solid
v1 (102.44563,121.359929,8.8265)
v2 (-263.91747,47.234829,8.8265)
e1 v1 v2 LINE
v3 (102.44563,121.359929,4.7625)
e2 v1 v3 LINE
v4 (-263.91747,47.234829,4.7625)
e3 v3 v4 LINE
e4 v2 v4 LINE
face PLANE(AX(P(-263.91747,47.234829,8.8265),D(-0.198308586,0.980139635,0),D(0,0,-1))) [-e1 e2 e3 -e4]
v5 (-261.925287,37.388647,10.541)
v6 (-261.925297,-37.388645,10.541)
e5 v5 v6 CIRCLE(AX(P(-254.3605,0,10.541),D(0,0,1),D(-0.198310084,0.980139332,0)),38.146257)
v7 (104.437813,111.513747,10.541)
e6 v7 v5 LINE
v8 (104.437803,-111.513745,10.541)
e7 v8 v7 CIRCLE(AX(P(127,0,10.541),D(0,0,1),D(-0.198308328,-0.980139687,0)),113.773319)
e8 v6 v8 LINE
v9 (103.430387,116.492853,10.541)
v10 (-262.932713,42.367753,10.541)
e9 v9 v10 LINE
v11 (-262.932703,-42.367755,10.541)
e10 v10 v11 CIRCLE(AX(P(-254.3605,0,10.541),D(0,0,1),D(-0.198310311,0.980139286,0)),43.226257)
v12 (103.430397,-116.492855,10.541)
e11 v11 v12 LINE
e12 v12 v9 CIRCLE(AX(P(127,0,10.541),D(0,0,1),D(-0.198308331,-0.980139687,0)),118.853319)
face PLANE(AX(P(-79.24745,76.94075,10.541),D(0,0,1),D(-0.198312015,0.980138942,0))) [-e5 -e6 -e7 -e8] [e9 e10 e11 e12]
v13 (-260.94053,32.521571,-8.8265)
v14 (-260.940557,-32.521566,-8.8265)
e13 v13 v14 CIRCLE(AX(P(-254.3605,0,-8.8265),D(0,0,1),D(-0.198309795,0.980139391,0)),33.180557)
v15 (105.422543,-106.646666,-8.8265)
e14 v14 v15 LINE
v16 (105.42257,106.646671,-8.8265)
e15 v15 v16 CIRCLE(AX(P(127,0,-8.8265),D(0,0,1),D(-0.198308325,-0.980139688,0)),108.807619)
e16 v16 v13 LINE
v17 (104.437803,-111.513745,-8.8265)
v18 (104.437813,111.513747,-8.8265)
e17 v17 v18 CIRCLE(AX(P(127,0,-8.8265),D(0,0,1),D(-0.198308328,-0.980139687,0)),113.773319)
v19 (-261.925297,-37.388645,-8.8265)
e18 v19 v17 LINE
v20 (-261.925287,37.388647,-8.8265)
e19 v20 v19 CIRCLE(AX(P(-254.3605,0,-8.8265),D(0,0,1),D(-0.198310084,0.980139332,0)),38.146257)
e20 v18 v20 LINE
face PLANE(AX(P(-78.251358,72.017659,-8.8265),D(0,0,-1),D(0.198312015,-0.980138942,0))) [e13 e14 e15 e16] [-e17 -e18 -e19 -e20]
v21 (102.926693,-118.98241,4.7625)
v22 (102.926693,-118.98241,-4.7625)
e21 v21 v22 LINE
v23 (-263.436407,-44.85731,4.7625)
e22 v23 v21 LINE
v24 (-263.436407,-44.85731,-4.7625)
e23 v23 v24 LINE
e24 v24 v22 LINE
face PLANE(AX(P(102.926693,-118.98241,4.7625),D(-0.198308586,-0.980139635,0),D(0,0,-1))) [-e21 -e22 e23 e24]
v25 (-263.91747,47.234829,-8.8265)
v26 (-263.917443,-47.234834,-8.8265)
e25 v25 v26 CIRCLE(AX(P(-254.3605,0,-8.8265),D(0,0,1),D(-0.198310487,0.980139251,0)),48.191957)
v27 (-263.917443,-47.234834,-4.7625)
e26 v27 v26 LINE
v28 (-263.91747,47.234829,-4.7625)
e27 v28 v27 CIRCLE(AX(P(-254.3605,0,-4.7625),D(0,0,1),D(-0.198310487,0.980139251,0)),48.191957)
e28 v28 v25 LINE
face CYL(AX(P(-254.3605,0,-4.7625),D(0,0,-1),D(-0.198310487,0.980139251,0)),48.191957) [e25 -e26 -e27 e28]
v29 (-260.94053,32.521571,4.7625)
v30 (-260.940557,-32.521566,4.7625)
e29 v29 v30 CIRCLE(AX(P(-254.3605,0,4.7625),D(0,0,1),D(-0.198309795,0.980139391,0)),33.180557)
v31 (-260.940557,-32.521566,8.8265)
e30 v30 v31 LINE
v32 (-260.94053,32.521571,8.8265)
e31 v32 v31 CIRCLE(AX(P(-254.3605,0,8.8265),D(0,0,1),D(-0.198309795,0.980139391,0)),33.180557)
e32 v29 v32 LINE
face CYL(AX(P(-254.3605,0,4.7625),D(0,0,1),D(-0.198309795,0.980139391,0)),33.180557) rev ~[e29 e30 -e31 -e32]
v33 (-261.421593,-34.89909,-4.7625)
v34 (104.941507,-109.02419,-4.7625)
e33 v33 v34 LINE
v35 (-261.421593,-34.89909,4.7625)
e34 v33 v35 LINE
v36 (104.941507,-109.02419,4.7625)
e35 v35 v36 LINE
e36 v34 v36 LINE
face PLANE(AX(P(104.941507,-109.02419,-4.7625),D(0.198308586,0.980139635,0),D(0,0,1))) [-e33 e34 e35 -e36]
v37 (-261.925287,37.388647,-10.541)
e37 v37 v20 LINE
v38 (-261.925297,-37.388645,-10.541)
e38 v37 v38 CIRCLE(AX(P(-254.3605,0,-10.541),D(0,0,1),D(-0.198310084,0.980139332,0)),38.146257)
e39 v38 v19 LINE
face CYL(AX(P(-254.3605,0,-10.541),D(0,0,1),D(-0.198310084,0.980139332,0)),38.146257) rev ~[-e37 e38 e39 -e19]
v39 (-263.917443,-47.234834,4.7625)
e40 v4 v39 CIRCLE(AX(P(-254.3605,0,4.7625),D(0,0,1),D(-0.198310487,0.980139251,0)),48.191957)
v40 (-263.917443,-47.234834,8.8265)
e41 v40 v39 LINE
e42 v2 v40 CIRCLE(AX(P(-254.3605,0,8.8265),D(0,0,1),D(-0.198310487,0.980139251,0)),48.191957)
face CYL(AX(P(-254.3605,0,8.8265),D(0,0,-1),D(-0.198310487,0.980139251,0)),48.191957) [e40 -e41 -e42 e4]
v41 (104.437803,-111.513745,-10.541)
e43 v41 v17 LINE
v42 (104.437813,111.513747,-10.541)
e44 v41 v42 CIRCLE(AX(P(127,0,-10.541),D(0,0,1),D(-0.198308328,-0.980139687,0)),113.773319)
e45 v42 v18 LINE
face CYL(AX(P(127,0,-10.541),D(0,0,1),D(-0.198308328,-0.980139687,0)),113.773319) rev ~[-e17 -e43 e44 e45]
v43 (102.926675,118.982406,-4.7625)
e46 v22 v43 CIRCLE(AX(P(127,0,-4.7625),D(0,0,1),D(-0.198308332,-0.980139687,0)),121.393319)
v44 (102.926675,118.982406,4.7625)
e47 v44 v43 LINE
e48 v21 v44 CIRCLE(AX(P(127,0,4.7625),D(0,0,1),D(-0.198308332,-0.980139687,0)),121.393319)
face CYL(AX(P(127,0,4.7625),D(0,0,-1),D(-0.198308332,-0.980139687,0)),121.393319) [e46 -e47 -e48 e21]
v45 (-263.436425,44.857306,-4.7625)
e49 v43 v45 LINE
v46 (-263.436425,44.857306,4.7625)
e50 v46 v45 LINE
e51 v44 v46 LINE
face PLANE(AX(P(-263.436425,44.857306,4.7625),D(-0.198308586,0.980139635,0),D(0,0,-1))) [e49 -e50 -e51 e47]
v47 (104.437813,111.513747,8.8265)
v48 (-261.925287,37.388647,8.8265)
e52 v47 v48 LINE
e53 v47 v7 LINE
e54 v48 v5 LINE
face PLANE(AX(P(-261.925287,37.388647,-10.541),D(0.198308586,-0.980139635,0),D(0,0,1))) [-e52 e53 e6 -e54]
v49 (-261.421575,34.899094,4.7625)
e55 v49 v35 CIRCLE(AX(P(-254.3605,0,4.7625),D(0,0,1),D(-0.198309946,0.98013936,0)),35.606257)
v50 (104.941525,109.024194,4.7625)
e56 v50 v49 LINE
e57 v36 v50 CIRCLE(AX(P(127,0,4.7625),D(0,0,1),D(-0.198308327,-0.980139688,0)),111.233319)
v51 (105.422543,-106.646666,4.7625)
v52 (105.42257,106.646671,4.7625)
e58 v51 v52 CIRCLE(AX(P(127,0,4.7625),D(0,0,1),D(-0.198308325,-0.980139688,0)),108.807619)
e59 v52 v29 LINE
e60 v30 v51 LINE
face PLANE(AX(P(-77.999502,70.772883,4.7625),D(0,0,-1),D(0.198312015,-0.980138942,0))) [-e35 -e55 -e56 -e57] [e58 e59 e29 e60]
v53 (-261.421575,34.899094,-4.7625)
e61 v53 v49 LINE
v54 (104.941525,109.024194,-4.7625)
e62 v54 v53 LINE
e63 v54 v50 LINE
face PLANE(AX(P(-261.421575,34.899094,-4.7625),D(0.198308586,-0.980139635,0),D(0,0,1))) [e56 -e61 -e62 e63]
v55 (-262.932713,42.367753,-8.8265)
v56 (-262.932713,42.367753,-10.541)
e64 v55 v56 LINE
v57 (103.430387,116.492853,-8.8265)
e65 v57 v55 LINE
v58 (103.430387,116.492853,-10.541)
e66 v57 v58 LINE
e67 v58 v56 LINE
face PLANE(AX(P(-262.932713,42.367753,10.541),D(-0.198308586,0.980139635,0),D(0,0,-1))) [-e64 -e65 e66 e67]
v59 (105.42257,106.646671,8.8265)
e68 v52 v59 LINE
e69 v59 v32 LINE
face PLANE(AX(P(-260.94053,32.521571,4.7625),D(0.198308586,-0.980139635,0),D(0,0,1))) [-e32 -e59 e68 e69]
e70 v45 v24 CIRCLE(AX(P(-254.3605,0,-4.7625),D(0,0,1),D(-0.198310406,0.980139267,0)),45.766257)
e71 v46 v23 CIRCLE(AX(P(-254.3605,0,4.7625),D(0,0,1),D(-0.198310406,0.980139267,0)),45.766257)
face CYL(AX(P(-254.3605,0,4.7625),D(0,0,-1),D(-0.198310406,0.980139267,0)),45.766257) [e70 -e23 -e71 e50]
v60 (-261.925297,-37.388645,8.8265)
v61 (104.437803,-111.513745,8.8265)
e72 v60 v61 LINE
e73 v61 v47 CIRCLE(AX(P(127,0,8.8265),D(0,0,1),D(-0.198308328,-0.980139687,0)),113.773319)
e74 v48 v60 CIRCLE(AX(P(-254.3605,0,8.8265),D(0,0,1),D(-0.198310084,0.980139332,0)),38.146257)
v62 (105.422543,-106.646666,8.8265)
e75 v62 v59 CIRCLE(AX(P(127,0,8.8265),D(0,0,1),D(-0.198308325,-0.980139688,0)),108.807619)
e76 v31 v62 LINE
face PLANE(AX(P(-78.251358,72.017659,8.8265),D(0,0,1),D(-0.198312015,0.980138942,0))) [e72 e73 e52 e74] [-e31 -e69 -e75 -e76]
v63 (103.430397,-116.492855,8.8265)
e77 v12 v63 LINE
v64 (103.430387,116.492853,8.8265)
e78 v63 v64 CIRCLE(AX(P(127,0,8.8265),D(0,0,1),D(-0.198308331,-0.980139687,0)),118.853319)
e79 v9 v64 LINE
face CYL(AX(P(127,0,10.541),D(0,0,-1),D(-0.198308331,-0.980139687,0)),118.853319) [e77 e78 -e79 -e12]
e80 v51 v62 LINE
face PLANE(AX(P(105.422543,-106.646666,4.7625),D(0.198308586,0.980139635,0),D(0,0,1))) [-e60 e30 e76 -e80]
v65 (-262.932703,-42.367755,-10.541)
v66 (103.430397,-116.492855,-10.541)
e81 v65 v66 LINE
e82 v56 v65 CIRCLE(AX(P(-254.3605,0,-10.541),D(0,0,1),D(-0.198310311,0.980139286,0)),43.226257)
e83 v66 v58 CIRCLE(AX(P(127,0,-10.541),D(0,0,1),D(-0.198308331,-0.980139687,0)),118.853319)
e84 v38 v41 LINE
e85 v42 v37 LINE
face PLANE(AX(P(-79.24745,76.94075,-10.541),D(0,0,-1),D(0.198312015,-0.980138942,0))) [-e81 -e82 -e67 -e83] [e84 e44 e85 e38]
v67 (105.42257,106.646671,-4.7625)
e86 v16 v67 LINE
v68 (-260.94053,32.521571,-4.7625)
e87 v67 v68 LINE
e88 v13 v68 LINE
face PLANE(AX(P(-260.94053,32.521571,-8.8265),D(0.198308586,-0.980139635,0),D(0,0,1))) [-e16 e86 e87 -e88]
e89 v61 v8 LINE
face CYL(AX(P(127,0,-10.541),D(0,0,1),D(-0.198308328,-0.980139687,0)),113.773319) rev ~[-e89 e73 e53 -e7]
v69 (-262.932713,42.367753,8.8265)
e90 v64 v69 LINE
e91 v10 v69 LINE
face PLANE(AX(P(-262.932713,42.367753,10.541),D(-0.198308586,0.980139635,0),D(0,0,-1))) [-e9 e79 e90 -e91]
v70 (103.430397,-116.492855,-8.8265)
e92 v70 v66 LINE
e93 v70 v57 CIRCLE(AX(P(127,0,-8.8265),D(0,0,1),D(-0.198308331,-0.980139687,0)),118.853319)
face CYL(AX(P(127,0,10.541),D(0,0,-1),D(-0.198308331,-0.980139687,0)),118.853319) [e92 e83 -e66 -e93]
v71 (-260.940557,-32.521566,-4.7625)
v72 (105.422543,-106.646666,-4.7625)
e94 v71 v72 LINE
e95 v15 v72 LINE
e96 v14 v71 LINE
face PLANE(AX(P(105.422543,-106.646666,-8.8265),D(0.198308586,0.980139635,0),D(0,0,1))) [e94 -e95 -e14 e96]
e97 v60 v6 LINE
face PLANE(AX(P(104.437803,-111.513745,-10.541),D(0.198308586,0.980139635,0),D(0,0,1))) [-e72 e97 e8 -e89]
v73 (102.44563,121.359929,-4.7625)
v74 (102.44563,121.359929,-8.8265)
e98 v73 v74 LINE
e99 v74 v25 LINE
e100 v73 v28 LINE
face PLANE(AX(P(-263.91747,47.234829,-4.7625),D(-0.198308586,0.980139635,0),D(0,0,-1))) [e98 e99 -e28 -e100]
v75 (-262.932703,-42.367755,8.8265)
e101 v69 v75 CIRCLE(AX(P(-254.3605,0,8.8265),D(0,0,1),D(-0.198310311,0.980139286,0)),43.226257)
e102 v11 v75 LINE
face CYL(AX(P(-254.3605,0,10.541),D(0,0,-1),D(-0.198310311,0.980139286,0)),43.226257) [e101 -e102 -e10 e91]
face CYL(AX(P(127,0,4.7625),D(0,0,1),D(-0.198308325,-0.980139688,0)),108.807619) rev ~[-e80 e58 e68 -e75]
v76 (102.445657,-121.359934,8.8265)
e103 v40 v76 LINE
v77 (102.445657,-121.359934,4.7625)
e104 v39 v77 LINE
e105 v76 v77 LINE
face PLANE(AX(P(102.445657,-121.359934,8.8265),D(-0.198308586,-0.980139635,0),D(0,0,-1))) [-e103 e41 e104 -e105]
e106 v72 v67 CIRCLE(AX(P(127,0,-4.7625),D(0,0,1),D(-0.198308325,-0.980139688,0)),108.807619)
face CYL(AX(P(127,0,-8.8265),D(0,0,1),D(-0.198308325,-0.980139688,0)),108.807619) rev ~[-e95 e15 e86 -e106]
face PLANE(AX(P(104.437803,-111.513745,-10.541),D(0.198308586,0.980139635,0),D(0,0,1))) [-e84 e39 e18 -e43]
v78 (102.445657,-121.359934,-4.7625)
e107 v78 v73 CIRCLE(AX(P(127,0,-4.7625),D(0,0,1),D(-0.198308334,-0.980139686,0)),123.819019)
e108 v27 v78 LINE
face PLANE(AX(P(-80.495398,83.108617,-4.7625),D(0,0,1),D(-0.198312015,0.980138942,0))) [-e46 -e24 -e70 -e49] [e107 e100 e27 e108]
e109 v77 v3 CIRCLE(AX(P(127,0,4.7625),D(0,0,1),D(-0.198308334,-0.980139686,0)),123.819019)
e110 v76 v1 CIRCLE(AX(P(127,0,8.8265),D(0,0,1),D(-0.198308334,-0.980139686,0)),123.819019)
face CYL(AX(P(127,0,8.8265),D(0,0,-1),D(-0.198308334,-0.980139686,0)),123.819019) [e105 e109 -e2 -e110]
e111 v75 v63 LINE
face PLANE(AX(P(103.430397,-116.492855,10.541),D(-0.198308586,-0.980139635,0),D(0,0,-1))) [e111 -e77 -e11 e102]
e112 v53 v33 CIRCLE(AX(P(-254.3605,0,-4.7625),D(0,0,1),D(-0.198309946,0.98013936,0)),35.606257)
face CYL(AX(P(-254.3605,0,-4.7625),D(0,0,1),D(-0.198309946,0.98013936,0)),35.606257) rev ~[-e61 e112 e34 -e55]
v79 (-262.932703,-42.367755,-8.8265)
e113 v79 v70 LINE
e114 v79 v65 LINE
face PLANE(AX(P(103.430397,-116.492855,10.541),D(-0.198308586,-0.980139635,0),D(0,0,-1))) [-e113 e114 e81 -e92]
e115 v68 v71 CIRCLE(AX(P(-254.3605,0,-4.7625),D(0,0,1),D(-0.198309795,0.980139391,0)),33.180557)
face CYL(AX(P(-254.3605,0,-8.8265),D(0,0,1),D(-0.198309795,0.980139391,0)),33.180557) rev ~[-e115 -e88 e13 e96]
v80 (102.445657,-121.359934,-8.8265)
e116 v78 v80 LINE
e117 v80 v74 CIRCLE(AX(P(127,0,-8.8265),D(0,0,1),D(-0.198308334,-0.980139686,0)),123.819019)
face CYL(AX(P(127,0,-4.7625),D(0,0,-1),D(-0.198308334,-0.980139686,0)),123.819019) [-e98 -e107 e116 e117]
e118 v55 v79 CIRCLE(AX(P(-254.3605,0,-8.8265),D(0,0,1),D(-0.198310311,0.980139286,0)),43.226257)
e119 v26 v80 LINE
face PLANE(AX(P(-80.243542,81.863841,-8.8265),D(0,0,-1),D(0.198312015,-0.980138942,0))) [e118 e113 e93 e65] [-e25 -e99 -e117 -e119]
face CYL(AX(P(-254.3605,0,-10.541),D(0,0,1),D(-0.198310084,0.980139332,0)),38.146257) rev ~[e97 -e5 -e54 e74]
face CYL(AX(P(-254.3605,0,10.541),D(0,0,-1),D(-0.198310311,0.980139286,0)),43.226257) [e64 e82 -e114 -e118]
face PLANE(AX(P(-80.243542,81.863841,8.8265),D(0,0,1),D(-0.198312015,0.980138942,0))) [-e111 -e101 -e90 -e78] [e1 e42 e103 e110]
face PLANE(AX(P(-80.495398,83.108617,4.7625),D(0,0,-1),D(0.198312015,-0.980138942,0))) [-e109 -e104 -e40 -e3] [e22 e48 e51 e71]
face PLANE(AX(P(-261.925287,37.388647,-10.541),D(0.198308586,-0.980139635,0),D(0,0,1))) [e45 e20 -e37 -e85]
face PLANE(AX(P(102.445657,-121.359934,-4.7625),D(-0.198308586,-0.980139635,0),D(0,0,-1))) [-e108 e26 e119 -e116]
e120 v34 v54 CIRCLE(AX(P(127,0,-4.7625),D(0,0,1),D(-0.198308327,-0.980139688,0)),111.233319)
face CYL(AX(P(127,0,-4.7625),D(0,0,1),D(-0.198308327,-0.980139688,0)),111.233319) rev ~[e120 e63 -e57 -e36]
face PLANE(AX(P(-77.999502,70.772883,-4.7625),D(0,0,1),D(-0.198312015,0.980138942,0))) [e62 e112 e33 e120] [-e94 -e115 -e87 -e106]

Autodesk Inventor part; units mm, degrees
ref_plane "Work Plane2" through (-254.3605, 0, 0) normal (-1, 0, 0) x (0, 0, 1)
ref_plane "Work Plane3" through (127, 0, 0) normal (-0.9976688, -0.0682424, 0) x (0, 0, 1)
sketch "Path" plane through (0, 0, 0) normal (0, 0, 1) x (1, 0, 0)
  arc A0 (-262.429, 39.8782) -> (-262.429, -39.8782) centre (-254.3605, 0) ccw
  arc A1 (103.9341, -114.0033) -> (103.9341, 114.0033) centre (127, 0) ccw
  line L0 (103.9341, -114.0033) -> (-262.429, -39.8782)
  line L1 (-262.429, 39.8782) -> (103.9341, 114.0033)
  dimension "d31" = 15.0114
ref_plane "Section Plane" through (-262.429, -39.8782, 0) normal (0.9801397, -0.1983084, 0) x (0, 0, 1)
sketch "Section Sketch" plane through (-262.429, -39.8782, 0) normal (0.9801397, -0.1983084, 0) x (0, 0, 1)
  line L0 (-10.541, -2.54) -> (10.541, -2.54)
  line L1 (10.541, -2.54) -> (10.541, 2.54)
  line L2 (10.541, 2.54) -> (-10.541, 2.54)
  line L3 (-10.541, 2.54) -> (-10.541, -2.54)
  line L4 (-4.7625, -5.08) -> (4.7625, -5.08)
  line L5 (4.7625, -5.08) -> (4.7625, 5.08)
  line L6 (4.7625, 5.08) -> (-4.7625, 5.08)
  line L7 (-4.7625, 5.08) -> (-4.7625, -5.08)
  line L8 (-4.7625, 0) -> (4.7625, 0) construction
  line L9 (-8.8265, -7.5057) -> (-4.7625, -7.5057)
  line L10 (-4.7625, -7.5057) -> (-4.7625, 7.5057)
  line L11 (-4.7625, 7.5057) -> (-8.8265, 7.5057)
  line L12 (-8.8265, 7.5057) -> (-8.8265, -7.5057)
  line L13 (4.7625, -7.5057) -> (8.8265, -7.5057)
  line L14 (8.8265, -7.5057) -> (8.8265, 7.5057)
  line L15 (8.8265, 7.5057) -> (4.7625, 7.5057)
  line L16 (4.7625, 7.5057) -> (4.7625, -7.5057)
  line L17 (-10.541, 0) -> (10.541, 0) construction
  point P0 (0, 0)
  point P1 (0, 0)
  dimension "d21" = 5.08
  dimension "d22" = 10.16
  dimension "d23" = 9.525
  dimension "d24" = 4.064
  dimension "d31" = 15.0114
  dimension "d32" = 21.082
sweep "Solid" add profiles "Section Sketch" path "Path"
pattern_of_one "Strand Pattern"
equation "\"d21\" = da_d2"
equation "\"d22\" = da_d1"
equation "\"d23\" = da_b1"
equation "\"d24\" = da_t1 + da_t2"
equation "\"d30\" = da_pt"
equation "\"da_p\" = 15.875"
equation "\"da_b1\" = 9.525"
equation "\"da_h2\" = 15.0114"
equation "\"da_h3\" = 13.0048"
equation "\"da_d1\" = 10.16"
equation "\"da_d2\" = 5.08"
equation "\"da_pt\" = 18.1102"
equation "\"da_b\" = 21.082"
equation "\"da_t1\" = 2.032"
equation "\"da_t2\" = 2.032"
properties part number "Roller Chain"
